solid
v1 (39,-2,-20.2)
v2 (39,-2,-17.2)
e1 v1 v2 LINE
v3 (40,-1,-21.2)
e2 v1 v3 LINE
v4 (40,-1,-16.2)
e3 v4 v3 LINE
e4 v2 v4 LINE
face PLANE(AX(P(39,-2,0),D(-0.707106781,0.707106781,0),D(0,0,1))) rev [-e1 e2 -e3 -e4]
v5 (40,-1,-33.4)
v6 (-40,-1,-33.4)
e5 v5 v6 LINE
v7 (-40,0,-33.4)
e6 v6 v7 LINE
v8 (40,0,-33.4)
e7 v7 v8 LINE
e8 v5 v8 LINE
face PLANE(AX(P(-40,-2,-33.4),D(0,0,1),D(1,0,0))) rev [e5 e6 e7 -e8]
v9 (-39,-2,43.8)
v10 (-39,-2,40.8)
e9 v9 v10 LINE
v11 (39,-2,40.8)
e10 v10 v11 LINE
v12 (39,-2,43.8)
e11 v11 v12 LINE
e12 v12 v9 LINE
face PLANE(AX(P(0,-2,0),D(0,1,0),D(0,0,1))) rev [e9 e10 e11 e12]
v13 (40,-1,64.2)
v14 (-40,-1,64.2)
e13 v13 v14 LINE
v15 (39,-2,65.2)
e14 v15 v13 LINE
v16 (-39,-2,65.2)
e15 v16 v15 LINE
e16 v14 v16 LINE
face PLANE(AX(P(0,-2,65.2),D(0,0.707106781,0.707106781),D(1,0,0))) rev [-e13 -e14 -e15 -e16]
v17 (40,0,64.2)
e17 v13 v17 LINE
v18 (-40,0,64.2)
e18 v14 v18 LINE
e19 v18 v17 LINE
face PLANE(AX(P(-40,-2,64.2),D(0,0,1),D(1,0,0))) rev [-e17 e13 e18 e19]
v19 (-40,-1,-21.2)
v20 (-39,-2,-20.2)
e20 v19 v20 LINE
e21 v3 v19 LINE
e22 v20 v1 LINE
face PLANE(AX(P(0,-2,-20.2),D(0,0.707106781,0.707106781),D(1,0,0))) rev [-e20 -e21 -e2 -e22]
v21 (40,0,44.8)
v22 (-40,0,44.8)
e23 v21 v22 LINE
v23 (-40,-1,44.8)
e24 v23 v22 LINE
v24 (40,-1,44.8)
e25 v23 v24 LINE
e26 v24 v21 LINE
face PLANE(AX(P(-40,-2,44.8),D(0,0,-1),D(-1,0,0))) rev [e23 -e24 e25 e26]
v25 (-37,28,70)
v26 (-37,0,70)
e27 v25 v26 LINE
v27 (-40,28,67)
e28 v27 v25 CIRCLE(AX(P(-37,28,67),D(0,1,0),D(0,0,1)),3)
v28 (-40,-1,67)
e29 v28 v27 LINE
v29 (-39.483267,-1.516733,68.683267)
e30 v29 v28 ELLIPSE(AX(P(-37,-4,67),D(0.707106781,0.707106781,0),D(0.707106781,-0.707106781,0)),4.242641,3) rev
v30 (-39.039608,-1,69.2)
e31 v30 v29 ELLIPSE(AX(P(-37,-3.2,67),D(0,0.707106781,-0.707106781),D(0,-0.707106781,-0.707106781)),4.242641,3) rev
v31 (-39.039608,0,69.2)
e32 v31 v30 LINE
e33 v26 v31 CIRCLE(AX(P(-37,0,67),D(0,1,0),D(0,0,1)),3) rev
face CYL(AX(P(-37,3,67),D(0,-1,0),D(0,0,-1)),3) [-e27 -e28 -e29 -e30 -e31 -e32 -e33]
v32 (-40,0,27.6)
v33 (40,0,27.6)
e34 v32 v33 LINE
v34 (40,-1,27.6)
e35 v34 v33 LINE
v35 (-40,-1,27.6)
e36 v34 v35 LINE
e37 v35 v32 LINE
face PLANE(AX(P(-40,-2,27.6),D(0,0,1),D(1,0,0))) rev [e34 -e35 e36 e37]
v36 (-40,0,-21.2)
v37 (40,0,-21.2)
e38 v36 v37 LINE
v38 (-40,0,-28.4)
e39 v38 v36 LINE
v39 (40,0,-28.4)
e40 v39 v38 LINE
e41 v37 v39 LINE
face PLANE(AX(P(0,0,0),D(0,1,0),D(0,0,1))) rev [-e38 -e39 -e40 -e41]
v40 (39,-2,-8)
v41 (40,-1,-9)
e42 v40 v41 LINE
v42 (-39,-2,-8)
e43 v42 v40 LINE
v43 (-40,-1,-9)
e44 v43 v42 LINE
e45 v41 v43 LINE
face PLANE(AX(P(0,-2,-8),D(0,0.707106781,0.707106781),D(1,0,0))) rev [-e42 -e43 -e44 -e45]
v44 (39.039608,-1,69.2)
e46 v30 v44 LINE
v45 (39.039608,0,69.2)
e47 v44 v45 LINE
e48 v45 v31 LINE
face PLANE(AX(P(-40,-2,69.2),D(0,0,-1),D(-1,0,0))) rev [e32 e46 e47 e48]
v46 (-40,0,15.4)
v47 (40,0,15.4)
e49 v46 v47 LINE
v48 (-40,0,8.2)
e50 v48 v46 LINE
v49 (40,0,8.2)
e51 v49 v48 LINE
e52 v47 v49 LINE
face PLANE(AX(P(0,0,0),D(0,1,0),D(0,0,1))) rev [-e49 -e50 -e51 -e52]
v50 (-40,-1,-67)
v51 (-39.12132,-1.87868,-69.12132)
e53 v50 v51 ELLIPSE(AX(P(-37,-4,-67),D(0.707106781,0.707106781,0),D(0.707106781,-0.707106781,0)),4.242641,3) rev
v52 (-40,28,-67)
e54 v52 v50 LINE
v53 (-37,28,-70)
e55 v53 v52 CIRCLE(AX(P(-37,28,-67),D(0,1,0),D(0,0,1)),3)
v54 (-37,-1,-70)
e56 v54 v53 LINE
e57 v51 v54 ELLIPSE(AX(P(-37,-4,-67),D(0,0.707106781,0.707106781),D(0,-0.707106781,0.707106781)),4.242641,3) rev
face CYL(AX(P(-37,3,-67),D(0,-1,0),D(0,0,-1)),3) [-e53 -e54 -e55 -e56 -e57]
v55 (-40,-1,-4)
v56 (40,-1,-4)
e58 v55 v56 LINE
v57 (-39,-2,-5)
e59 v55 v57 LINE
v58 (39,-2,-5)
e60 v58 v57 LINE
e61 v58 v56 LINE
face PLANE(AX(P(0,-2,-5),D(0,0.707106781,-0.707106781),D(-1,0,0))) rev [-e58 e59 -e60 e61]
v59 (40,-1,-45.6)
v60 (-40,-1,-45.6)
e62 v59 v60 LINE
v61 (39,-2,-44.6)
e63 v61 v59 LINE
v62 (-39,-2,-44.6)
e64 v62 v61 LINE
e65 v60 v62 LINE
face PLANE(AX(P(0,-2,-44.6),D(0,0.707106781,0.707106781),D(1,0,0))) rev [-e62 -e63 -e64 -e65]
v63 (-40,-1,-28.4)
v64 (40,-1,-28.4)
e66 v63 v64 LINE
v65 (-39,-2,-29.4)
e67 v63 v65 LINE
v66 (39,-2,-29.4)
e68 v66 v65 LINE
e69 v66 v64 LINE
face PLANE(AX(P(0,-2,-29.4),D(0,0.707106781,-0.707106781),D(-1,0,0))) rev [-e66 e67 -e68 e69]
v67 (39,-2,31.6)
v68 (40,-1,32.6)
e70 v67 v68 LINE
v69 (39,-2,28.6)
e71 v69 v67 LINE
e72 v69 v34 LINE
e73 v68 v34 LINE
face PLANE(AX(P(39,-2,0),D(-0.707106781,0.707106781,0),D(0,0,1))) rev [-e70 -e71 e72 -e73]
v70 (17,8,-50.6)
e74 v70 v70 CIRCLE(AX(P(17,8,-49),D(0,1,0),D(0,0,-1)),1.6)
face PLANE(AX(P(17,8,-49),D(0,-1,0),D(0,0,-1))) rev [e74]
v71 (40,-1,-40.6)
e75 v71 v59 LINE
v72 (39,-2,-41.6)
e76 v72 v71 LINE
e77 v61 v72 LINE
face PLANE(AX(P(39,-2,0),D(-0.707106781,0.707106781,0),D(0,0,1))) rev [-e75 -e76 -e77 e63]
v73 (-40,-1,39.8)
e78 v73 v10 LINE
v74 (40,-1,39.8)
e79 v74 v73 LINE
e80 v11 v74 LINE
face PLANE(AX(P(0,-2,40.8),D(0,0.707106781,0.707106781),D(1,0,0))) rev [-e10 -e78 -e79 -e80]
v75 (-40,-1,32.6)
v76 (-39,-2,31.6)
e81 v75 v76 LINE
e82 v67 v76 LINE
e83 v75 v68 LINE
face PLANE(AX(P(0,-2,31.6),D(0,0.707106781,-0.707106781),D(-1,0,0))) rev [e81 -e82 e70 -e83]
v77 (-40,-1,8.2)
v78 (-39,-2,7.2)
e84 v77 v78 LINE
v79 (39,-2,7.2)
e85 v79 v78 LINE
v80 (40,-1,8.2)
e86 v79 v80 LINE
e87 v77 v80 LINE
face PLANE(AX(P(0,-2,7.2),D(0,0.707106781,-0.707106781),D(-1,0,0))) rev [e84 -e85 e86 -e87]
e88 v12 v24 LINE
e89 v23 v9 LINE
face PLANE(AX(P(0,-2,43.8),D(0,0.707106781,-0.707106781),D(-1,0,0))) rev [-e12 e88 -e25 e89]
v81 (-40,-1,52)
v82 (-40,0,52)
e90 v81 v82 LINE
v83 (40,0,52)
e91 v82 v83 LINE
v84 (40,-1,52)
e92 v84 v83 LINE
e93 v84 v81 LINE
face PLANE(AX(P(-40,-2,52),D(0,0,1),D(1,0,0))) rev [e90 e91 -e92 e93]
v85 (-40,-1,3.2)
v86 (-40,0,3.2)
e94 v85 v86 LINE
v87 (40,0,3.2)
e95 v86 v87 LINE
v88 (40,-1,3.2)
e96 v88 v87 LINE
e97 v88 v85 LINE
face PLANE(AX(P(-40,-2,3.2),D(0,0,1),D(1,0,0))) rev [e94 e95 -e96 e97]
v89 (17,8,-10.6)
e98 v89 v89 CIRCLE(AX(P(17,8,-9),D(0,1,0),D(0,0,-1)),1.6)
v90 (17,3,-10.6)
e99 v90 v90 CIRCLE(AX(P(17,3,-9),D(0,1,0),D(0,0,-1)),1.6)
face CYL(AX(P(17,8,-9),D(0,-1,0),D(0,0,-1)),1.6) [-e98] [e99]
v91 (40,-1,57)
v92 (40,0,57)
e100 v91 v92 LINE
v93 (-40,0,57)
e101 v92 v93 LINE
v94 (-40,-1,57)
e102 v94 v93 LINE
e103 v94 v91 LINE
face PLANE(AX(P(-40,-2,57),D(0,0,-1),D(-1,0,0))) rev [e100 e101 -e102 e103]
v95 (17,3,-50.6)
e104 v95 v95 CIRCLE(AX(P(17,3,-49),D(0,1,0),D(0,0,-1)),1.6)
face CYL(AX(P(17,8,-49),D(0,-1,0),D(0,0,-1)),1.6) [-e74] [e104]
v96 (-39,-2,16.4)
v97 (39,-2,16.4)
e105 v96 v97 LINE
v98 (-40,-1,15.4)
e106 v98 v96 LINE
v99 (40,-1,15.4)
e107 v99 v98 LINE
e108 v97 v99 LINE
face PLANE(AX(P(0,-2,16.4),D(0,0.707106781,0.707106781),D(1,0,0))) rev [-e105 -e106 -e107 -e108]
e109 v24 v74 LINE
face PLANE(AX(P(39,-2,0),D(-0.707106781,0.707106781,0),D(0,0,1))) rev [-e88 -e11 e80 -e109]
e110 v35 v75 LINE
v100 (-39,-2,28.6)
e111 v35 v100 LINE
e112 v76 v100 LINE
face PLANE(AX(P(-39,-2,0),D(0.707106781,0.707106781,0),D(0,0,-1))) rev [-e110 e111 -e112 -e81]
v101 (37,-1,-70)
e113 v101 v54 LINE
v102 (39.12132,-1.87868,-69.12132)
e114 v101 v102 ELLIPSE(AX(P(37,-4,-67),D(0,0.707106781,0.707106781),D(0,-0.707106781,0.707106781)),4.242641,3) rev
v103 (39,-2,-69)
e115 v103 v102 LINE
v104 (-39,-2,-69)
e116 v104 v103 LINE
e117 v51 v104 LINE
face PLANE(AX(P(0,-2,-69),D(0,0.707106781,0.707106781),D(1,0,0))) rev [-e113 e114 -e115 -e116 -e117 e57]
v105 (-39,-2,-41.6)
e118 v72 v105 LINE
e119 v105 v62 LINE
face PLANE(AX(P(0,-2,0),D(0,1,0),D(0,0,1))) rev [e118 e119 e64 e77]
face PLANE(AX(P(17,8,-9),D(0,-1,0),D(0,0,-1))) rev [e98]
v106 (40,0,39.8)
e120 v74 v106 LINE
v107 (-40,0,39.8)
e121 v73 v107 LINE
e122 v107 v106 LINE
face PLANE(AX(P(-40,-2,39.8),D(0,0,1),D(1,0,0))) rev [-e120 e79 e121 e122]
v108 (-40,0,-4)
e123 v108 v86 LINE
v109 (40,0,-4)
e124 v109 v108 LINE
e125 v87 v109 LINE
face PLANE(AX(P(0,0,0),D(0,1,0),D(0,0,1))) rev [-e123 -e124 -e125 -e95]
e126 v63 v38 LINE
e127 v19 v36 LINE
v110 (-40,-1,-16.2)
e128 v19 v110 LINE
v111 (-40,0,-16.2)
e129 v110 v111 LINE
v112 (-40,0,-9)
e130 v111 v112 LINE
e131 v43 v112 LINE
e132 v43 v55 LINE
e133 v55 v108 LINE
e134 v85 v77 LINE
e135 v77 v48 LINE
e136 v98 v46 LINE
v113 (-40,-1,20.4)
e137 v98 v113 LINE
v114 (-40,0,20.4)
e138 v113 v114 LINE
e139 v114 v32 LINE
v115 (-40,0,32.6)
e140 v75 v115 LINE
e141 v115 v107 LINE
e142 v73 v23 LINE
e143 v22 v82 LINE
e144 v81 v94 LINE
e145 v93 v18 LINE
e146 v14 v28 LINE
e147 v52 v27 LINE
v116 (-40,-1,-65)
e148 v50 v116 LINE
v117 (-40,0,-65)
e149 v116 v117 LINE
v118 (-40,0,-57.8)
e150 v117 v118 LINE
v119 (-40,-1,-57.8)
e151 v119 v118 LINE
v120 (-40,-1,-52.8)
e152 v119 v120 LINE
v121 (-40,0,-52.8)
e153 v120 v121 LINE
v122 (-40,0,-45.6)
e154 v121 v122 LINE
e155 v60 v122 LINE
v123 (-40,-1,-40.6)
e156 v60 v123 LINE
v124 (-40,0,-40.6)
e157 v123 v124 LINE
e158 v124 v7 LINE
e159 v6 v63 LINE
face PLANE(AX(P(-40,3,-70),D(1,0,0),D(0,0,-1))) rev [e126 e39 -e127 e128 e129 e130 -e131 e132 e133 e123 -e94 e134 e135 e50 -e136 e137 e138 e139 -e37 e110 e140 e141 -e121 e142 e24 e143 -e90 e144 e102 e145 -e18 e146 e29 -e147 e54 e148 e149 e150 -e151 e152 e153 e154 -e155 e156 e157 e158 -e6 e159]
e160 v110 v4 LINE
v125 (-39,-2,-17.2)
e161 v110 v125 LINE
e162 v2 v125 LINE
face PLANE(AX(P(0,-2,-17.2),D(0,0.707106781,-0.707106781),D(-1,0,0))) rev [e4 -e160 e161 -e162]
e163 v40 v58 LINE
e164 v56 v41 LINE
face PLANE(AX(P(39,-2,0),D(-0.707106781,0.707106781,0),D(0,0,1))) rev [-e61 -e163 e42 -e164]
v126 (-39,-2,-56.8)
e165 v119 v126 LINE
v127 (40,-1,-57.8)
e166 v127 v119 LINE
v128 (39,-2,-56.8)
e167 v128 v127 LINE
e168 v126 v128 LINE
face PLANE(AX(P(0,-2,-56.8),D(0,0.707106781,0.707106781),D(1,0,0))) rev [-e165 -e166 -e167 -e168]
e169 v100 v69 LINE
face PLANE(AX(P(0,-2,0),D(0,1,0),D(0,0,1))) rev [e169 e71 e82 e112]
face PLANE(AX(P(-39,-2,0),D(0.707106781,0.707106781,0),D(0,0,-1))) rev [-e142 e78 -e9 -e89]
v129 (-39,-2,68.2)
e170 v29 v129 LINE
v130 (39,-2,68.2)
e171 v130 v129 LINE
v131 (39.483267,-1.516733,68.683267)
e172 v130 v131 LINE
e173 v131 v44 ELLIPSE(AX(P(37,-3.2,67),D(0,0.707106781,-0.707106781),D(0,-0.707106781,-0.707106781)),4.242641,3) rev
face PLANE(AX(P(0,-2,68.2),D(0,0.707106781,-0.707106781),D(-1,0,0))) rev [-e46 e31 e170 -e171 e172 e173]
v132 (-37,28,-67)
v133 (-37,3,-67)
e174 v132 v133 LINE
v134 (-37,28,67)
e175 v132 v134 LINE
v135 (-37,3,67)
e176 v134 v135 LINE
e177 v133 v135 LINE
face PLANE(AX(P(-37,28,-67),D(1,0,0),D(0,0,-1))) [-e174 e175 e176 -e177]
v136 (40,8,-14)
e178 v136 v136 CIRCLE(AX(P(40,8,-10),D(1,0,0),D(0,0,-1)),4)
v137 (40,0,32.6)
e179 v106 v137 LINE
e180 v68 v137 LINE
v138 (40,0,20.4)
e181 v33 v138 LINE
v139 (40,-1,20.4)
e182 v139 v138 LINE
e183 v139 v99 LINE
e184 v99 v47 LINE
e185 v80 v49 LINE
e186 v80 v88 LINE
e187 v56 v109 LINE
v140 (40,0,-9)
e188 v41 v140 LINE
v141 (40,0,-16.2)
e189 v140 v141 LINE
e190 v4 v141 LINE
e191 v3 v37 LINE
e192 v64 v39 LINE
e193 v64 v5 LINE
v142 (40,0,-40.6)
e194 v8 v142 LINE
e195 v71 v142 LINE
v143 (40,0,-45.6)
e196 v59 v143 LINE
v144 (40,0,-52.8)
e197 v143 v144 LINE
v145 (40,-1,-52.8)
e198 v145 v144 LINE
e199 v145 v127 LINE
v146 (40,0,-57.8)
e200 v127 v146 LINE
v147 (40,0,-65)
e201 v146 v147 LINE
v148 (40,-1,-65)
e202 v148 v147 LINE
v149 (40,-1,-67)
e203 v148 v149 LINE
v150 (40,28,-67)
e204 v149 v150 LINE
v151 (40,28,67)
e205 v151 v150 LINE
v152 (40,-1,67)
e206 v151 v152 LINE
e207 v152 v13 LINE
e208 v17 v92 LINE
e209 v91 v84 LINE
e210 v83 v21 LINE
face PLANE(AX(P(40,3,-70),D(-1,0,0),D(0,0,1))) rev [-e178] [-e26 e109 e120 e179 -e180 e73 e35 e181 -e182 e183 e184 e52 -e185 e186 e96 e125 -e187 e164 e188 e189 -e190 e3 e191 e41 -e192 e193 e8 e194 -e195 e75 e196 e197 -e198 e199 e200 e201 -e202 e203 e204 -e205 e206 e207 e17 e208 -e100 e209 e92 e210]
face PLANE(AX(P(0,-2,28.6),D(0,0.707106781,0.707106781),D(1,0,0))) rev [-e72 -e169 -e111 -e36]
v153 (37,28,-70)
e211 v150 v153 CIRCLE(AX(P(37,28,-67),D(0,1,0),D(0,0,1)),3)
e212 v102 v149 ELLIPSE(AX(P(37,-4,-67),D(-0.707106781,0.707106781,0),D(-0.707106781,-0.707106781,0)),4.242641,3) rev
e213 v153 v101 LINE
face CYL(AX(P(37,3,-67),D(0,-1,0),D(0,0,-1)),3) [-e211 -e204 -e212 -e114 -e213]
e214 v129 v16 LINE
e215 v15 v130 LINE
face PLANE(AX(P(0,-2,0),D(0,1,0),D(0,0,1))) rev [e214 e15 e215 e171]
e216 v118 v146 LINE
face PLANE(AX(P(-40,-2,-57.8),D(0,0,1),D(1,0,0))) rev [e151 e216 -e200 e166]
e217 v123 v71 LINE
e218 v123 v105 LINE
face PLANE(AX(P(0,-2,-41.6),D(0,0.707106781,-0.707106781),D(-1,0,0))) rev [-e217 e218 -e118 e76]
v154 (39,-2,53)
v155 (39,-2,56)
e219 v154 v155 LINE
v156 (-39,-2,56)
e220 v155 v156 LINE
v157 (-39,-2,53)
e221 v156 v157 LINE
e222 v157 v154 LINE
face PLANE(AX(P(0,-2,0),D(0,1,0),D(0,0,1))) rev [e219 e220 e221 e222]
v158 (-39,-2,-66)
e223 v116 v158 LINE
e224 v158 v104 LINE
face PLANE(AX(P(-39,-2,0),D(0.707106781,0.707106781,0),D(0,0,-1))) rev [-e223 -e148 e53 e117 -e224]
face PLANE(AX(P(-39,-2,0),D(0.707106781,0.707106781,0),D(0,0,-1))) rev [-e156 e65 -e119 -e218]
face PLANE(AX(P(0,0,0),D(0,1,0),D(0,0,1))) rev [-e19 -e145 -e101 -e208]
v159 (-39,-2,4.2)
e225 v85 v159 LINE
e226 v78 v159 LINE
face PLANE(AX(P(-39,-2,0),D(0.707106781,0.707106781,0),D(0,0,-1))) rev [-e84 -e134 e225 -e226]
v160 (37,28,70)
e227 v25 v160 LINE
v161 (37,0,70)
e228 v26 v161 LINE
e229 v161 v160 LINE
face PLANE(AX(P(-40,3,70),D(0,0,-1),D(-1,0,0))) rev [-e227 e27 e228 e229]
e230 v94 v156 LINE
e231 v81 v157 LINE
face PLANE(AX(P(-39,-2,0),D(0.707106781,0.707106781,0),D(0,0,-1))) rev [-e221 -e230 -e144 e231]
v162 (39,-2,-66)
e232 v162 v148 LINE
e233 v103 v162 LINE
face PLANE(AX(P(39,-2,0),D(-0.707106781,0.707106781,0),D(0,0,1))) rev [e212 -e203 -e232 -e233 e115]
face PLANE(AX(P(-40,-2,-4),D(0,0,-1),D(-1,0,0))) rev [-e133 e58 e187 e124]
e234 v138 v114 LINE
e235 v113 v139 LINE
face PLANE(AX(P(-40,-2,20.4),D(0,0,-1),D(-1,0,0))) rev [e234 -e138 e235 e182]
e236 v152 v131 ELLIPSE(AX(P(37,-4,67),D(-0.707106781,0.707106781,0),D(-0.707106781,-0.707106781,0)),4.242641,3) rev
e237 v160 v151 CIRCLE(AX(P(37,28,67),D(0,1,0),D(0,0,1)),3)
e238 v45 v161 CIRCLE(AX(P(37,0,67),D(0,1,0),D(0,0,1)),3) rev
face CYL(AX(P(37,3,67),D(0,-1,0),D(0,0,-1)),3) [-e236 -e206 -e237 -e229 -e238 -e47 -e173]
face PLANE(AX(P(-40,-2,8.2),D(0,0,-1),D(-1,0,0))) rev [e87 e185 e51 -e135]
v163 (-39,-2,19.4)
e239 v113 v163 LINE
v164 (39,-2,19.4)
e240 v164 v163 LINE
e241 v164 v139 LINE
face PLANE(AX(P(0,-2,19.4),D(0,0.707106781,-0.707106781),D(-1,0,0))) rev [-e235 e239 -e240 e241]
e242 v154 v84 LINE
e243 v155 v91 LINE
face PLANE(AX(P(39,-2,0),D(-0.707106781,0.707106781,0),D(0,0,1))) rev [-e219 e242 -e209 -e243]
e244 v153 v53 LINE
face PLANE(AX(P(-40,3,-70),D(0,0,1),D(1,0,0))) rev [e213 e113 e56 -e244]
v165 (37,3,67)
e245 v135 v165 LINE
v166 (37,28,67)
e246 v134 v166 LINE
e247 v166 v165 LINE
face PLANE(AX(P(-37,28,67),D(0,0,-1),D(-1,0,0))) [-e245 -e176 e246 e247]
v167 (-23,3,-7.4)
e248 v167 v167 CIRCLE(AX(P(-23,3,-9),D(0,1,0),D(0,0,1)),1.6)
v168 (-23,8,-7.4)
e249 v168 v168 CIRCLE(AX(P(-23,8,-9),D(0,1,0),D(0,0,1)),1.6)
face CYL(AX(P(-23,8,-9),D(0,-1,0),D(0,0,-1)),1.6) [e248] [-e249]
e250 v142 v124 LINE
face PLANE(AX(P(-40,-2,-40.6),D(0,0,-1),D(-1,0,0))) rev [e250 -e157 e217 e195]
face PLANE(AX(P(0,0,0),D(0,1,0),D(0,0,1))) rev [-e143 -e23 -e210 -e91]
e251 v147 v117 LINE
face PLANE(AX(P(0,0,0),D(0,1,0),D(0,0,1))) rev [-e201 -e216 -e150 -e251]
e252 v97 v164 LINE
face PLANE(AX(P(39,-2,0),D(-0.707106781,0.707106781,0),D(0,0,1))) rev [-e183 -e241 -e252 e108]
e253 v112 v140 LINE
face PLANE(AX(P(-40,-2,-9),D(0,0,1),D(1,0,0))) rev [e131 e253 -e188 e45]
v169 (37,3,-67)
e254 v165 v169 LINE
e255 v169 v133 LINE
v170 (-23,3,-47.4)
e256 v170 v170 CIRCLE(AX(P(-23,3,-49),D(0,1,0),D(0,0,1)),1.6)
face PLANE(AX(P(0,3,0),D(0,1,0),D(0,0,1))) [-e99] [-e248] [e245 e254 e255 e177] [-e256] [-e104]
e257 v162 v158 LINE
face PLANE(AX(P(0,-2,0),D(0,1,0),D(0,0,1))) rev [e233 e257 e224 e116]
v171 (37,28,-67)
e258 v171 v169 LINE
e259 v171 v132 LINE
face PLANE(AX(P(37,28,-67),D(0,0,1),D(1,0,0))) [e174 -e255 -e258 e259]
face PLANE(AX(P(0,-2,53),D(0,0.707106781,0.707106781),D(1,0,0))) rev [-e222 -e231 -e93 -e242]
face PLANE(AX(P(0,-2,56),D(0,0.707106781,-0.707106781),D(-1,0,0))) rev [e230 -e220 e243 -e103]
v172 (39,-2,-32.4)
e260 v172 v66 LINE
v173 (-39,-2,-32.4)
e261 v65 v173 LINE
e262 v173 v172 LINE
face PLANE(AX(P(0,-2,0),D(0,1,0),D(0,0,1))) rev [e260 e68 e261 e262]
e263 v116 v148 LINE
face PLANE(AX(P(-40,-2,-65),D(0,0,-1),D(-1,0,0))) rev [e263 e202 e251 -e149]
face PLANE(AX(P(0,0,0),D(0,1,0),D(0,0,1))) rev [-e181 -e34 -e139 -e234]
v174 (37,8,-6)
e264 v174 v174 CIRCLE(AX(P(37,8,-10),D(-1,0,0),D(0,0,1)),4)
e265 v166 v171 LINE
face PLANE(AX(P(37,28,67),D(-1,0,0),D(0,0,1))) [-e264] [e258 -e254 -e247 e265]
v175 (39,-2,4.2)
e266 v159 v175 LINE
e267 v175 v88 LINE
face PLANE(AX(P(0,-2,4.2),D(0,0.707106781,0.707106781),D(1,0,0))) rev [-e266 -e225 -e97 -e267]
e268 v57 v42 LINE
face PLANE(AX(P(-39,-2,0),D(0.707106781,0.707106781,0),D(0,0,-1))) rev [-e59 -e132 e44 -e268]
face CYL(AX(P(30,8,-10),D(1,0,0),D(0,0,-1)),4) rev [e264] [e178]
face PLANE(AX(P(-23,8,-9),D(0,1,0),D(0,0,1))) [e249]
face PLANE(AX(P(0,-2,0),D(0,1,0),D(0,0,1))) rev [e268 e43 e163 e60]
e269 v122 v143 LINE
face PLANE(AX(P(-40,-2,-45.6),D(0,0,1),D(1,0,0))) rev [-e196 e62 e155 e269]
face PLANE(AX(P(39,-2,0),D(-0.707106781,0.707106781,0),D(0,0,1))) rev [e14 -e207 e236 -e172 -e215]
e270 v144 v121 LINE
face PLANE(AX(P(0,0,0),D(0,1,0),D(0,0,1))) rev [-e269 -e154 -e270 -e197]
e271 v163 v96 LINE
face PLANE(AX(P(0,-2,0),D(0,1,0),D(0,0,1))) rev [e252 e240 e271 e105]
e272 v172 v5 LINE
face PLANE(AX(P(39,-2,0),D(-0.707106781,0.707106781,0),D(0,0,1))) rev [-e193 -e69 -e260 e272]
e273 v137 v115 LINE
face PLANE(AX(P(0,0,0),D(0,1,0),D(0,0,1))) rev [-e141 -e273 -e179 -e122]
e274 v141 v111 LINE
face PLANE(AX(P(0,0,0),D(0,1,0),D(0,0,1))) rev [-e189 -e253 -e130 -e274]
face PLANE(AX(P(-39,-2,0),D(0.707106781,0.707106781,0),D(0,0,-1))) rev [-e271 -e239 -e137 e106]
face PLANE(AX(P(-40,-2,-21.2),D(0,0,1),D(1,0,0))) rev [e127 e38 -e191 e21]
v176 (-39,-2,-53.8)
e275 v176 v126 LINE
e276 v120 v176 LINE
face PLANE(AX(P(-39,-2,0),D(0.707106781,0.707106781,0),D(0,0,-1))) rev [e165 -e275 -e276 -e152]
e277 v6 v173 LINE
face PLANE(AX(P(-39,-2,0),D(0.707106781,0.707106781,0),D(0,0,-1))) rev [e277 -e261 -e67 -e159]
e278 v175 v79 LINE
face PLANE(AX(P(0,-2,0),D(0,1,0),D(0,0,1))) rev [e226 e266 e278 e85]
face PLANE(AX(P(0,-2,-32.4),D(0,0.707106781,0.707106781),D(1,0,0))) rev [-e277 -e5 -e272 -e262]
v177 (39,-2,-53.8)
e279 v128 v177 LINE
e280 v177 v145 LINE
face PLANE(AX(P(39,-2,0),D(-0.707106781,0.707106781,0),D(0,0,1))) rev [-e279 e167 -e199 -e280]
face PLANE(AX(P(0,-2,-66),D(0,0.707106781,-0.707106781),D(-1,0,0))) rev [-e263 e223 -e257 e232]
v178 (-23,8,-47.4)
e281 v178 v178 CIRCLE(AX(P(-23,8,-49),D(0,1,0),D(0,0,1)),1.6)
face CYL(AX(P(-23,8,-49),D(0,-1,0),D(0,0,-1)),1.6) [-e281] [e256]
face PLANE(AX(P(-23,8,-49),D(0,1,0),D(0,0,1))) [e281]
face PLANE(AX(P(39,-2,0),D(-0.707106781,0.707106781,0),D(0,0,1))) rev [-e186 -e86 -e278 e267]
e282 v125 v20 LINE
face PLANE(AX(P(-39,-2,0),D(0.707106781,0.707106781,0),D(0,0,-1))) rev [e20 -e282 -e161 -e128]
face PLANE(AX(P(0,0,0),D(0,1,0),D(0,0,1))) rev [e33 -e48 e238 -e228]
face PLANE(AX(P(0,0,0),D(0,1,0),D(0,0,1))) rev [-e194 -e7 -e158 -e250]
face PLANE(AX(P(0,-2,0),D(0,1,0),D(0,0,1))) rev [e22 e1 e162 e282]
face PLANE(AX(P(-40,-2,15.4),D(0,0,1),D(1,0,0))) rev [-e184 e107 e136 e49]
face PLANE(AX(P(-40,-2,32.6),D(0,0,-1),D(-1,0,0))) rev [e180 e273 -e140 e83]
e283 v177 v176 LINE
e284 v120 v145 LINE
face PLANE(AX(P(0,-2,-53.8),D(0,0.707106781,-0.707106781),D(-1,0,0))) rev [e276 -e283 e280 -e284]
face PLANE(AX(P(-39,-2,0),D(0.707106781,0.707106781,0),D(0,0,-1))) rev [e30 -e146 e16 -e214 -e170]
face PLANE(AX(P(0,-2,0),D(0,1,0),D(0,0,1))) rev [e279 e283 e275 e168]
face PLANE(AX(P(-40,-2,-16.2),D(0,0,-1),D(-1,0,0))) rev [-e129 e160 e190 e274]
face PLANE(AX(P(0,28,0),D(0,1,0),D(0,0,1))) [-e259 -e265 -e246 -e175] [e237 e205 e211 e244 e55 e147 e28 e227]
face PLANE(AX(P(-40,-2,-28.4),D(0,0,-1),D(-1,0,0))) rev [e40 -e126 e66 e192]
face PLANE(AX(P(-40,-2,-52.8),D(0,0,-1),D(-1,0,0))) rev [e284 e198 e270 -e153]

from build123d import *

# Parameters (mm, degrees)
SKETCH1_W           = 80
SKETCH1_H           = 140
BOSS_EXTRUDE1_DEPTH = 3
SKETCH2_W           = 80
SKETCH2_H           = 140
SKETCH2_W_2         = 74
SKETCH2_H_2         = 134
BOSS_EXTRUDE2_DEPTH = 25
SKETCH3_R           = 1.6
BOSS_EXTRUDE3_DEPTH = 5
SKETCH4_W           = 80
SKETCH4_H           = 5
BOSS_EXTRUDE4_DEPTH = 2
CHAMFER1_SIZE       = 1
SKETCH5_R           = 4
CUT_EXTRUDE1_DEPTH  = 10
FILLET1_R           = 3


with BuildPart() as part:
    # Sketch1 → Boss-Extrude1 (new body)
    with BuildSketch(Plane(origin=(0, 0, 0), x_dir=(1, 0, 0), z_dir=(0, 1, 0))):
        Rectangle(SKETCH1_W, SKETCH1_H)
    extrude(amount=BOSS_EXTRUDE1_DEPTH)

    # Sketch2 → Boss-Extrude2 (add)
    with BuildSketch(Plane(origin=(0, 3, 0), x_dir=(1, 0, 0), z_dir=(0, 1, 0))):
        Rectangle(SKETCH2_W, SKETCH2_H)
        Rectangle(SKETCH2_W_2, SKETCH2_H_2, mode=Mode.SUBTRACT)
    extrude(amount=BOSS_EXTRUDE2_DEPTH)

    # Sketch3 → Boss-Extrude3 (add)
    with BuildSketch(Plane(origin=(0, 3, 0), x_dir=(1, 0, 0), z_dir=(0, 1, 0))):
        with Locations(Location((-23, 49, 0), (0, 0, 270))):
            Circle(SKETCH3_R)
        with Locations(Location((-23, 9, 0), (0, 0, 270))):
            Circle(SKETCH3_R)
        with Locations(Location((17, 9, 0), (0, 0, 90))):
            Circle(SKETCH3_R)
        with Locations(Location((17, 49, 0), (0, 0, 90))):
            Circle(SKETCH3_R)
    extrude(amount=BOSS_EXTRUDE3_DEPTH)

    # Sketch4 → Boss-Extrude4 (add)
    with BuildSketch(Plane.XZ):
        with Locations((0, -67.5)):
            Rectangle(SKETCH4_W, SKETCH4_H)
        with Locations((0, -55.3)):
            Rectangle(SKETCH4_W, SKETCH4_H)
        with Locations((0, -43.1)):
            Rectangle(SKETCH4_W, SKETCH4_H)
        with Locations((0, -30.9)):
            Rectangle(SKETCH4_W, SKETCH4_H)
        with Locations((0, -18.7)):
            Rectangle(SKETCH4_W, SKETCH4_H)
        with Locations((0, -6.5)):
            Rectangle(SKETCH4_W, SKETCH4_H)
        with Locations((0, 5.7)):
            Rectangle(SKETCH4_W, SKETCH4_H)
        with Locations((0, 17.9)):
            Rectangle(SKETCH4_W, SKETCH4_H)
        with Locations((0, 30.1)):
            Rectangle(SKETCH4_W, SKETCH4_H)
        with Locations((0, 42.3)):
            Rectangle(SKETCH4_W, SKETCH4_H)
        with Locations((0, 54.5)):
            Rectangle(SKETCH4_W, SKETCH4_H)
        with Locations((0, 66.7)):
            Rectangle(SKETCH4_W, SKETCH4_H)
    extrude(amount=BOSS_EXTRUDE4_DEPTH)

    # Chamfer1
    chamfer1_edges = [part.edges().sort_by_distance(p)[0] for p in [
        (0, -2, -16.2),
        (-40, -2, -6.5),
        (0, -2, -9),
        (40, -2, -6.5),
        (0, -2, -4),
        (-40, -2, 5.7),
        (0, -2, 3.2),
        (40, -2, 5.7),
        (0, -2, 8.2),
        (-40, -2, 17.9),
        (0, -2, 15.4),
        (40, -2, 17.9),
        (0, -2, 20.4),
        (-40, -2, 30.1),
        (0, -2, 27.6),
        (40, -2, 30.1),
        (0, -2, 32.6),
        (-40, -2, 42.3),
        (0, -2, 39.8),
        (40, -2, 42.3),
        (0, -2, 44.8),
        (-40, -2, 54.5),
        (0, -2, 52),
        (40, -2, 54.5),
        (0, -2, 57),
        (-40, -2, 66.7),
        (0, -2, 64.2),
        (40, -2, 66.7),
        (0, -2, 69.2),
        (-40, -2, -67.5),
        (0, -2, -70),
        (40, -2, -67.5),
        (0, -2, -65),
        (-40, -2, -55.3),
        (0, -2, -57.8),
        (40, -2, -55.3),
        (0, -2, -52.8),
        (-40, -2, -43.1),
        (0, -2, -45.6),
        (40, -2, -43.1),
        (0, -2, -40.6),
        (-40, -2, -30.9),
        (0, -2, -33.4),
        (40, -2, -30.9),
        (0, -2, -28.4),
        (-40, -2, -18.7),
        (0, -2, -21.2),
        (40, -2, -18.7),
    ]]
    chamfer(chamfer1_edges, length=CHAMFER1_SIZE)

    # Sketch5 → Cut-Extrude1 (cut)
    with BuildSketch(Plane(origin=(40, 0, 0), x_dir=(0, 0, -1), z_dir=(1, 0, 0))):
        with Locations((10, 8)):
            Circle(SKETCH5_R)
    extrude(amount=-CUT_EXTRUDE1_DEPTH, mode=Mode.SUBTRACT)

    # Fillet1
    # the kernel refuses this fillet: 3 mm, written as the material it takes off along each edge
    with BuildSketch(Plane(origin=(40, 35.5, 70), x_dir=(0, 0, -1), z_dir=(0, -1, 0)), Plane(origin=(-40, -7.5, 70), x_dir=(0, 0, -1), z_dir=(0, 1, 0))) as fillet1_piece_1:
        with BuildLine():
            CenterArc((FILLET1_R, -FILLET1_R), FILLET1_R, 90, 90)
            Line((0, -FILLET1_R), (0, 0))
            Line((0, 0), (FILLET1_R, 0))
        make_face()
    extrude(amount=43, mode=Mode.SUBTRACT)
    with BuildSketch(Plane(origin=(40, 35.5, -70), x_dir=(-1, 0, 0), z_dir=(0, -1, 0)), Plane(origin=(-40, -8.5, -70), x_dir=(1, 0, 0), z_dir=(0, 1, 0))) as fillet1_piece_2:
        with BuildLine():
            CenterArc((FILLET1_R, -FILLET1_R), FILLET1_R, 90, 90)
            Line((0, -FILLET1_R), (0, 0))
            Line((0, 0), (FILLET1_R, 0))
        make_face()
    extrude(amount=44, mode=Mode.SUBTRACT)


solid = part.part
